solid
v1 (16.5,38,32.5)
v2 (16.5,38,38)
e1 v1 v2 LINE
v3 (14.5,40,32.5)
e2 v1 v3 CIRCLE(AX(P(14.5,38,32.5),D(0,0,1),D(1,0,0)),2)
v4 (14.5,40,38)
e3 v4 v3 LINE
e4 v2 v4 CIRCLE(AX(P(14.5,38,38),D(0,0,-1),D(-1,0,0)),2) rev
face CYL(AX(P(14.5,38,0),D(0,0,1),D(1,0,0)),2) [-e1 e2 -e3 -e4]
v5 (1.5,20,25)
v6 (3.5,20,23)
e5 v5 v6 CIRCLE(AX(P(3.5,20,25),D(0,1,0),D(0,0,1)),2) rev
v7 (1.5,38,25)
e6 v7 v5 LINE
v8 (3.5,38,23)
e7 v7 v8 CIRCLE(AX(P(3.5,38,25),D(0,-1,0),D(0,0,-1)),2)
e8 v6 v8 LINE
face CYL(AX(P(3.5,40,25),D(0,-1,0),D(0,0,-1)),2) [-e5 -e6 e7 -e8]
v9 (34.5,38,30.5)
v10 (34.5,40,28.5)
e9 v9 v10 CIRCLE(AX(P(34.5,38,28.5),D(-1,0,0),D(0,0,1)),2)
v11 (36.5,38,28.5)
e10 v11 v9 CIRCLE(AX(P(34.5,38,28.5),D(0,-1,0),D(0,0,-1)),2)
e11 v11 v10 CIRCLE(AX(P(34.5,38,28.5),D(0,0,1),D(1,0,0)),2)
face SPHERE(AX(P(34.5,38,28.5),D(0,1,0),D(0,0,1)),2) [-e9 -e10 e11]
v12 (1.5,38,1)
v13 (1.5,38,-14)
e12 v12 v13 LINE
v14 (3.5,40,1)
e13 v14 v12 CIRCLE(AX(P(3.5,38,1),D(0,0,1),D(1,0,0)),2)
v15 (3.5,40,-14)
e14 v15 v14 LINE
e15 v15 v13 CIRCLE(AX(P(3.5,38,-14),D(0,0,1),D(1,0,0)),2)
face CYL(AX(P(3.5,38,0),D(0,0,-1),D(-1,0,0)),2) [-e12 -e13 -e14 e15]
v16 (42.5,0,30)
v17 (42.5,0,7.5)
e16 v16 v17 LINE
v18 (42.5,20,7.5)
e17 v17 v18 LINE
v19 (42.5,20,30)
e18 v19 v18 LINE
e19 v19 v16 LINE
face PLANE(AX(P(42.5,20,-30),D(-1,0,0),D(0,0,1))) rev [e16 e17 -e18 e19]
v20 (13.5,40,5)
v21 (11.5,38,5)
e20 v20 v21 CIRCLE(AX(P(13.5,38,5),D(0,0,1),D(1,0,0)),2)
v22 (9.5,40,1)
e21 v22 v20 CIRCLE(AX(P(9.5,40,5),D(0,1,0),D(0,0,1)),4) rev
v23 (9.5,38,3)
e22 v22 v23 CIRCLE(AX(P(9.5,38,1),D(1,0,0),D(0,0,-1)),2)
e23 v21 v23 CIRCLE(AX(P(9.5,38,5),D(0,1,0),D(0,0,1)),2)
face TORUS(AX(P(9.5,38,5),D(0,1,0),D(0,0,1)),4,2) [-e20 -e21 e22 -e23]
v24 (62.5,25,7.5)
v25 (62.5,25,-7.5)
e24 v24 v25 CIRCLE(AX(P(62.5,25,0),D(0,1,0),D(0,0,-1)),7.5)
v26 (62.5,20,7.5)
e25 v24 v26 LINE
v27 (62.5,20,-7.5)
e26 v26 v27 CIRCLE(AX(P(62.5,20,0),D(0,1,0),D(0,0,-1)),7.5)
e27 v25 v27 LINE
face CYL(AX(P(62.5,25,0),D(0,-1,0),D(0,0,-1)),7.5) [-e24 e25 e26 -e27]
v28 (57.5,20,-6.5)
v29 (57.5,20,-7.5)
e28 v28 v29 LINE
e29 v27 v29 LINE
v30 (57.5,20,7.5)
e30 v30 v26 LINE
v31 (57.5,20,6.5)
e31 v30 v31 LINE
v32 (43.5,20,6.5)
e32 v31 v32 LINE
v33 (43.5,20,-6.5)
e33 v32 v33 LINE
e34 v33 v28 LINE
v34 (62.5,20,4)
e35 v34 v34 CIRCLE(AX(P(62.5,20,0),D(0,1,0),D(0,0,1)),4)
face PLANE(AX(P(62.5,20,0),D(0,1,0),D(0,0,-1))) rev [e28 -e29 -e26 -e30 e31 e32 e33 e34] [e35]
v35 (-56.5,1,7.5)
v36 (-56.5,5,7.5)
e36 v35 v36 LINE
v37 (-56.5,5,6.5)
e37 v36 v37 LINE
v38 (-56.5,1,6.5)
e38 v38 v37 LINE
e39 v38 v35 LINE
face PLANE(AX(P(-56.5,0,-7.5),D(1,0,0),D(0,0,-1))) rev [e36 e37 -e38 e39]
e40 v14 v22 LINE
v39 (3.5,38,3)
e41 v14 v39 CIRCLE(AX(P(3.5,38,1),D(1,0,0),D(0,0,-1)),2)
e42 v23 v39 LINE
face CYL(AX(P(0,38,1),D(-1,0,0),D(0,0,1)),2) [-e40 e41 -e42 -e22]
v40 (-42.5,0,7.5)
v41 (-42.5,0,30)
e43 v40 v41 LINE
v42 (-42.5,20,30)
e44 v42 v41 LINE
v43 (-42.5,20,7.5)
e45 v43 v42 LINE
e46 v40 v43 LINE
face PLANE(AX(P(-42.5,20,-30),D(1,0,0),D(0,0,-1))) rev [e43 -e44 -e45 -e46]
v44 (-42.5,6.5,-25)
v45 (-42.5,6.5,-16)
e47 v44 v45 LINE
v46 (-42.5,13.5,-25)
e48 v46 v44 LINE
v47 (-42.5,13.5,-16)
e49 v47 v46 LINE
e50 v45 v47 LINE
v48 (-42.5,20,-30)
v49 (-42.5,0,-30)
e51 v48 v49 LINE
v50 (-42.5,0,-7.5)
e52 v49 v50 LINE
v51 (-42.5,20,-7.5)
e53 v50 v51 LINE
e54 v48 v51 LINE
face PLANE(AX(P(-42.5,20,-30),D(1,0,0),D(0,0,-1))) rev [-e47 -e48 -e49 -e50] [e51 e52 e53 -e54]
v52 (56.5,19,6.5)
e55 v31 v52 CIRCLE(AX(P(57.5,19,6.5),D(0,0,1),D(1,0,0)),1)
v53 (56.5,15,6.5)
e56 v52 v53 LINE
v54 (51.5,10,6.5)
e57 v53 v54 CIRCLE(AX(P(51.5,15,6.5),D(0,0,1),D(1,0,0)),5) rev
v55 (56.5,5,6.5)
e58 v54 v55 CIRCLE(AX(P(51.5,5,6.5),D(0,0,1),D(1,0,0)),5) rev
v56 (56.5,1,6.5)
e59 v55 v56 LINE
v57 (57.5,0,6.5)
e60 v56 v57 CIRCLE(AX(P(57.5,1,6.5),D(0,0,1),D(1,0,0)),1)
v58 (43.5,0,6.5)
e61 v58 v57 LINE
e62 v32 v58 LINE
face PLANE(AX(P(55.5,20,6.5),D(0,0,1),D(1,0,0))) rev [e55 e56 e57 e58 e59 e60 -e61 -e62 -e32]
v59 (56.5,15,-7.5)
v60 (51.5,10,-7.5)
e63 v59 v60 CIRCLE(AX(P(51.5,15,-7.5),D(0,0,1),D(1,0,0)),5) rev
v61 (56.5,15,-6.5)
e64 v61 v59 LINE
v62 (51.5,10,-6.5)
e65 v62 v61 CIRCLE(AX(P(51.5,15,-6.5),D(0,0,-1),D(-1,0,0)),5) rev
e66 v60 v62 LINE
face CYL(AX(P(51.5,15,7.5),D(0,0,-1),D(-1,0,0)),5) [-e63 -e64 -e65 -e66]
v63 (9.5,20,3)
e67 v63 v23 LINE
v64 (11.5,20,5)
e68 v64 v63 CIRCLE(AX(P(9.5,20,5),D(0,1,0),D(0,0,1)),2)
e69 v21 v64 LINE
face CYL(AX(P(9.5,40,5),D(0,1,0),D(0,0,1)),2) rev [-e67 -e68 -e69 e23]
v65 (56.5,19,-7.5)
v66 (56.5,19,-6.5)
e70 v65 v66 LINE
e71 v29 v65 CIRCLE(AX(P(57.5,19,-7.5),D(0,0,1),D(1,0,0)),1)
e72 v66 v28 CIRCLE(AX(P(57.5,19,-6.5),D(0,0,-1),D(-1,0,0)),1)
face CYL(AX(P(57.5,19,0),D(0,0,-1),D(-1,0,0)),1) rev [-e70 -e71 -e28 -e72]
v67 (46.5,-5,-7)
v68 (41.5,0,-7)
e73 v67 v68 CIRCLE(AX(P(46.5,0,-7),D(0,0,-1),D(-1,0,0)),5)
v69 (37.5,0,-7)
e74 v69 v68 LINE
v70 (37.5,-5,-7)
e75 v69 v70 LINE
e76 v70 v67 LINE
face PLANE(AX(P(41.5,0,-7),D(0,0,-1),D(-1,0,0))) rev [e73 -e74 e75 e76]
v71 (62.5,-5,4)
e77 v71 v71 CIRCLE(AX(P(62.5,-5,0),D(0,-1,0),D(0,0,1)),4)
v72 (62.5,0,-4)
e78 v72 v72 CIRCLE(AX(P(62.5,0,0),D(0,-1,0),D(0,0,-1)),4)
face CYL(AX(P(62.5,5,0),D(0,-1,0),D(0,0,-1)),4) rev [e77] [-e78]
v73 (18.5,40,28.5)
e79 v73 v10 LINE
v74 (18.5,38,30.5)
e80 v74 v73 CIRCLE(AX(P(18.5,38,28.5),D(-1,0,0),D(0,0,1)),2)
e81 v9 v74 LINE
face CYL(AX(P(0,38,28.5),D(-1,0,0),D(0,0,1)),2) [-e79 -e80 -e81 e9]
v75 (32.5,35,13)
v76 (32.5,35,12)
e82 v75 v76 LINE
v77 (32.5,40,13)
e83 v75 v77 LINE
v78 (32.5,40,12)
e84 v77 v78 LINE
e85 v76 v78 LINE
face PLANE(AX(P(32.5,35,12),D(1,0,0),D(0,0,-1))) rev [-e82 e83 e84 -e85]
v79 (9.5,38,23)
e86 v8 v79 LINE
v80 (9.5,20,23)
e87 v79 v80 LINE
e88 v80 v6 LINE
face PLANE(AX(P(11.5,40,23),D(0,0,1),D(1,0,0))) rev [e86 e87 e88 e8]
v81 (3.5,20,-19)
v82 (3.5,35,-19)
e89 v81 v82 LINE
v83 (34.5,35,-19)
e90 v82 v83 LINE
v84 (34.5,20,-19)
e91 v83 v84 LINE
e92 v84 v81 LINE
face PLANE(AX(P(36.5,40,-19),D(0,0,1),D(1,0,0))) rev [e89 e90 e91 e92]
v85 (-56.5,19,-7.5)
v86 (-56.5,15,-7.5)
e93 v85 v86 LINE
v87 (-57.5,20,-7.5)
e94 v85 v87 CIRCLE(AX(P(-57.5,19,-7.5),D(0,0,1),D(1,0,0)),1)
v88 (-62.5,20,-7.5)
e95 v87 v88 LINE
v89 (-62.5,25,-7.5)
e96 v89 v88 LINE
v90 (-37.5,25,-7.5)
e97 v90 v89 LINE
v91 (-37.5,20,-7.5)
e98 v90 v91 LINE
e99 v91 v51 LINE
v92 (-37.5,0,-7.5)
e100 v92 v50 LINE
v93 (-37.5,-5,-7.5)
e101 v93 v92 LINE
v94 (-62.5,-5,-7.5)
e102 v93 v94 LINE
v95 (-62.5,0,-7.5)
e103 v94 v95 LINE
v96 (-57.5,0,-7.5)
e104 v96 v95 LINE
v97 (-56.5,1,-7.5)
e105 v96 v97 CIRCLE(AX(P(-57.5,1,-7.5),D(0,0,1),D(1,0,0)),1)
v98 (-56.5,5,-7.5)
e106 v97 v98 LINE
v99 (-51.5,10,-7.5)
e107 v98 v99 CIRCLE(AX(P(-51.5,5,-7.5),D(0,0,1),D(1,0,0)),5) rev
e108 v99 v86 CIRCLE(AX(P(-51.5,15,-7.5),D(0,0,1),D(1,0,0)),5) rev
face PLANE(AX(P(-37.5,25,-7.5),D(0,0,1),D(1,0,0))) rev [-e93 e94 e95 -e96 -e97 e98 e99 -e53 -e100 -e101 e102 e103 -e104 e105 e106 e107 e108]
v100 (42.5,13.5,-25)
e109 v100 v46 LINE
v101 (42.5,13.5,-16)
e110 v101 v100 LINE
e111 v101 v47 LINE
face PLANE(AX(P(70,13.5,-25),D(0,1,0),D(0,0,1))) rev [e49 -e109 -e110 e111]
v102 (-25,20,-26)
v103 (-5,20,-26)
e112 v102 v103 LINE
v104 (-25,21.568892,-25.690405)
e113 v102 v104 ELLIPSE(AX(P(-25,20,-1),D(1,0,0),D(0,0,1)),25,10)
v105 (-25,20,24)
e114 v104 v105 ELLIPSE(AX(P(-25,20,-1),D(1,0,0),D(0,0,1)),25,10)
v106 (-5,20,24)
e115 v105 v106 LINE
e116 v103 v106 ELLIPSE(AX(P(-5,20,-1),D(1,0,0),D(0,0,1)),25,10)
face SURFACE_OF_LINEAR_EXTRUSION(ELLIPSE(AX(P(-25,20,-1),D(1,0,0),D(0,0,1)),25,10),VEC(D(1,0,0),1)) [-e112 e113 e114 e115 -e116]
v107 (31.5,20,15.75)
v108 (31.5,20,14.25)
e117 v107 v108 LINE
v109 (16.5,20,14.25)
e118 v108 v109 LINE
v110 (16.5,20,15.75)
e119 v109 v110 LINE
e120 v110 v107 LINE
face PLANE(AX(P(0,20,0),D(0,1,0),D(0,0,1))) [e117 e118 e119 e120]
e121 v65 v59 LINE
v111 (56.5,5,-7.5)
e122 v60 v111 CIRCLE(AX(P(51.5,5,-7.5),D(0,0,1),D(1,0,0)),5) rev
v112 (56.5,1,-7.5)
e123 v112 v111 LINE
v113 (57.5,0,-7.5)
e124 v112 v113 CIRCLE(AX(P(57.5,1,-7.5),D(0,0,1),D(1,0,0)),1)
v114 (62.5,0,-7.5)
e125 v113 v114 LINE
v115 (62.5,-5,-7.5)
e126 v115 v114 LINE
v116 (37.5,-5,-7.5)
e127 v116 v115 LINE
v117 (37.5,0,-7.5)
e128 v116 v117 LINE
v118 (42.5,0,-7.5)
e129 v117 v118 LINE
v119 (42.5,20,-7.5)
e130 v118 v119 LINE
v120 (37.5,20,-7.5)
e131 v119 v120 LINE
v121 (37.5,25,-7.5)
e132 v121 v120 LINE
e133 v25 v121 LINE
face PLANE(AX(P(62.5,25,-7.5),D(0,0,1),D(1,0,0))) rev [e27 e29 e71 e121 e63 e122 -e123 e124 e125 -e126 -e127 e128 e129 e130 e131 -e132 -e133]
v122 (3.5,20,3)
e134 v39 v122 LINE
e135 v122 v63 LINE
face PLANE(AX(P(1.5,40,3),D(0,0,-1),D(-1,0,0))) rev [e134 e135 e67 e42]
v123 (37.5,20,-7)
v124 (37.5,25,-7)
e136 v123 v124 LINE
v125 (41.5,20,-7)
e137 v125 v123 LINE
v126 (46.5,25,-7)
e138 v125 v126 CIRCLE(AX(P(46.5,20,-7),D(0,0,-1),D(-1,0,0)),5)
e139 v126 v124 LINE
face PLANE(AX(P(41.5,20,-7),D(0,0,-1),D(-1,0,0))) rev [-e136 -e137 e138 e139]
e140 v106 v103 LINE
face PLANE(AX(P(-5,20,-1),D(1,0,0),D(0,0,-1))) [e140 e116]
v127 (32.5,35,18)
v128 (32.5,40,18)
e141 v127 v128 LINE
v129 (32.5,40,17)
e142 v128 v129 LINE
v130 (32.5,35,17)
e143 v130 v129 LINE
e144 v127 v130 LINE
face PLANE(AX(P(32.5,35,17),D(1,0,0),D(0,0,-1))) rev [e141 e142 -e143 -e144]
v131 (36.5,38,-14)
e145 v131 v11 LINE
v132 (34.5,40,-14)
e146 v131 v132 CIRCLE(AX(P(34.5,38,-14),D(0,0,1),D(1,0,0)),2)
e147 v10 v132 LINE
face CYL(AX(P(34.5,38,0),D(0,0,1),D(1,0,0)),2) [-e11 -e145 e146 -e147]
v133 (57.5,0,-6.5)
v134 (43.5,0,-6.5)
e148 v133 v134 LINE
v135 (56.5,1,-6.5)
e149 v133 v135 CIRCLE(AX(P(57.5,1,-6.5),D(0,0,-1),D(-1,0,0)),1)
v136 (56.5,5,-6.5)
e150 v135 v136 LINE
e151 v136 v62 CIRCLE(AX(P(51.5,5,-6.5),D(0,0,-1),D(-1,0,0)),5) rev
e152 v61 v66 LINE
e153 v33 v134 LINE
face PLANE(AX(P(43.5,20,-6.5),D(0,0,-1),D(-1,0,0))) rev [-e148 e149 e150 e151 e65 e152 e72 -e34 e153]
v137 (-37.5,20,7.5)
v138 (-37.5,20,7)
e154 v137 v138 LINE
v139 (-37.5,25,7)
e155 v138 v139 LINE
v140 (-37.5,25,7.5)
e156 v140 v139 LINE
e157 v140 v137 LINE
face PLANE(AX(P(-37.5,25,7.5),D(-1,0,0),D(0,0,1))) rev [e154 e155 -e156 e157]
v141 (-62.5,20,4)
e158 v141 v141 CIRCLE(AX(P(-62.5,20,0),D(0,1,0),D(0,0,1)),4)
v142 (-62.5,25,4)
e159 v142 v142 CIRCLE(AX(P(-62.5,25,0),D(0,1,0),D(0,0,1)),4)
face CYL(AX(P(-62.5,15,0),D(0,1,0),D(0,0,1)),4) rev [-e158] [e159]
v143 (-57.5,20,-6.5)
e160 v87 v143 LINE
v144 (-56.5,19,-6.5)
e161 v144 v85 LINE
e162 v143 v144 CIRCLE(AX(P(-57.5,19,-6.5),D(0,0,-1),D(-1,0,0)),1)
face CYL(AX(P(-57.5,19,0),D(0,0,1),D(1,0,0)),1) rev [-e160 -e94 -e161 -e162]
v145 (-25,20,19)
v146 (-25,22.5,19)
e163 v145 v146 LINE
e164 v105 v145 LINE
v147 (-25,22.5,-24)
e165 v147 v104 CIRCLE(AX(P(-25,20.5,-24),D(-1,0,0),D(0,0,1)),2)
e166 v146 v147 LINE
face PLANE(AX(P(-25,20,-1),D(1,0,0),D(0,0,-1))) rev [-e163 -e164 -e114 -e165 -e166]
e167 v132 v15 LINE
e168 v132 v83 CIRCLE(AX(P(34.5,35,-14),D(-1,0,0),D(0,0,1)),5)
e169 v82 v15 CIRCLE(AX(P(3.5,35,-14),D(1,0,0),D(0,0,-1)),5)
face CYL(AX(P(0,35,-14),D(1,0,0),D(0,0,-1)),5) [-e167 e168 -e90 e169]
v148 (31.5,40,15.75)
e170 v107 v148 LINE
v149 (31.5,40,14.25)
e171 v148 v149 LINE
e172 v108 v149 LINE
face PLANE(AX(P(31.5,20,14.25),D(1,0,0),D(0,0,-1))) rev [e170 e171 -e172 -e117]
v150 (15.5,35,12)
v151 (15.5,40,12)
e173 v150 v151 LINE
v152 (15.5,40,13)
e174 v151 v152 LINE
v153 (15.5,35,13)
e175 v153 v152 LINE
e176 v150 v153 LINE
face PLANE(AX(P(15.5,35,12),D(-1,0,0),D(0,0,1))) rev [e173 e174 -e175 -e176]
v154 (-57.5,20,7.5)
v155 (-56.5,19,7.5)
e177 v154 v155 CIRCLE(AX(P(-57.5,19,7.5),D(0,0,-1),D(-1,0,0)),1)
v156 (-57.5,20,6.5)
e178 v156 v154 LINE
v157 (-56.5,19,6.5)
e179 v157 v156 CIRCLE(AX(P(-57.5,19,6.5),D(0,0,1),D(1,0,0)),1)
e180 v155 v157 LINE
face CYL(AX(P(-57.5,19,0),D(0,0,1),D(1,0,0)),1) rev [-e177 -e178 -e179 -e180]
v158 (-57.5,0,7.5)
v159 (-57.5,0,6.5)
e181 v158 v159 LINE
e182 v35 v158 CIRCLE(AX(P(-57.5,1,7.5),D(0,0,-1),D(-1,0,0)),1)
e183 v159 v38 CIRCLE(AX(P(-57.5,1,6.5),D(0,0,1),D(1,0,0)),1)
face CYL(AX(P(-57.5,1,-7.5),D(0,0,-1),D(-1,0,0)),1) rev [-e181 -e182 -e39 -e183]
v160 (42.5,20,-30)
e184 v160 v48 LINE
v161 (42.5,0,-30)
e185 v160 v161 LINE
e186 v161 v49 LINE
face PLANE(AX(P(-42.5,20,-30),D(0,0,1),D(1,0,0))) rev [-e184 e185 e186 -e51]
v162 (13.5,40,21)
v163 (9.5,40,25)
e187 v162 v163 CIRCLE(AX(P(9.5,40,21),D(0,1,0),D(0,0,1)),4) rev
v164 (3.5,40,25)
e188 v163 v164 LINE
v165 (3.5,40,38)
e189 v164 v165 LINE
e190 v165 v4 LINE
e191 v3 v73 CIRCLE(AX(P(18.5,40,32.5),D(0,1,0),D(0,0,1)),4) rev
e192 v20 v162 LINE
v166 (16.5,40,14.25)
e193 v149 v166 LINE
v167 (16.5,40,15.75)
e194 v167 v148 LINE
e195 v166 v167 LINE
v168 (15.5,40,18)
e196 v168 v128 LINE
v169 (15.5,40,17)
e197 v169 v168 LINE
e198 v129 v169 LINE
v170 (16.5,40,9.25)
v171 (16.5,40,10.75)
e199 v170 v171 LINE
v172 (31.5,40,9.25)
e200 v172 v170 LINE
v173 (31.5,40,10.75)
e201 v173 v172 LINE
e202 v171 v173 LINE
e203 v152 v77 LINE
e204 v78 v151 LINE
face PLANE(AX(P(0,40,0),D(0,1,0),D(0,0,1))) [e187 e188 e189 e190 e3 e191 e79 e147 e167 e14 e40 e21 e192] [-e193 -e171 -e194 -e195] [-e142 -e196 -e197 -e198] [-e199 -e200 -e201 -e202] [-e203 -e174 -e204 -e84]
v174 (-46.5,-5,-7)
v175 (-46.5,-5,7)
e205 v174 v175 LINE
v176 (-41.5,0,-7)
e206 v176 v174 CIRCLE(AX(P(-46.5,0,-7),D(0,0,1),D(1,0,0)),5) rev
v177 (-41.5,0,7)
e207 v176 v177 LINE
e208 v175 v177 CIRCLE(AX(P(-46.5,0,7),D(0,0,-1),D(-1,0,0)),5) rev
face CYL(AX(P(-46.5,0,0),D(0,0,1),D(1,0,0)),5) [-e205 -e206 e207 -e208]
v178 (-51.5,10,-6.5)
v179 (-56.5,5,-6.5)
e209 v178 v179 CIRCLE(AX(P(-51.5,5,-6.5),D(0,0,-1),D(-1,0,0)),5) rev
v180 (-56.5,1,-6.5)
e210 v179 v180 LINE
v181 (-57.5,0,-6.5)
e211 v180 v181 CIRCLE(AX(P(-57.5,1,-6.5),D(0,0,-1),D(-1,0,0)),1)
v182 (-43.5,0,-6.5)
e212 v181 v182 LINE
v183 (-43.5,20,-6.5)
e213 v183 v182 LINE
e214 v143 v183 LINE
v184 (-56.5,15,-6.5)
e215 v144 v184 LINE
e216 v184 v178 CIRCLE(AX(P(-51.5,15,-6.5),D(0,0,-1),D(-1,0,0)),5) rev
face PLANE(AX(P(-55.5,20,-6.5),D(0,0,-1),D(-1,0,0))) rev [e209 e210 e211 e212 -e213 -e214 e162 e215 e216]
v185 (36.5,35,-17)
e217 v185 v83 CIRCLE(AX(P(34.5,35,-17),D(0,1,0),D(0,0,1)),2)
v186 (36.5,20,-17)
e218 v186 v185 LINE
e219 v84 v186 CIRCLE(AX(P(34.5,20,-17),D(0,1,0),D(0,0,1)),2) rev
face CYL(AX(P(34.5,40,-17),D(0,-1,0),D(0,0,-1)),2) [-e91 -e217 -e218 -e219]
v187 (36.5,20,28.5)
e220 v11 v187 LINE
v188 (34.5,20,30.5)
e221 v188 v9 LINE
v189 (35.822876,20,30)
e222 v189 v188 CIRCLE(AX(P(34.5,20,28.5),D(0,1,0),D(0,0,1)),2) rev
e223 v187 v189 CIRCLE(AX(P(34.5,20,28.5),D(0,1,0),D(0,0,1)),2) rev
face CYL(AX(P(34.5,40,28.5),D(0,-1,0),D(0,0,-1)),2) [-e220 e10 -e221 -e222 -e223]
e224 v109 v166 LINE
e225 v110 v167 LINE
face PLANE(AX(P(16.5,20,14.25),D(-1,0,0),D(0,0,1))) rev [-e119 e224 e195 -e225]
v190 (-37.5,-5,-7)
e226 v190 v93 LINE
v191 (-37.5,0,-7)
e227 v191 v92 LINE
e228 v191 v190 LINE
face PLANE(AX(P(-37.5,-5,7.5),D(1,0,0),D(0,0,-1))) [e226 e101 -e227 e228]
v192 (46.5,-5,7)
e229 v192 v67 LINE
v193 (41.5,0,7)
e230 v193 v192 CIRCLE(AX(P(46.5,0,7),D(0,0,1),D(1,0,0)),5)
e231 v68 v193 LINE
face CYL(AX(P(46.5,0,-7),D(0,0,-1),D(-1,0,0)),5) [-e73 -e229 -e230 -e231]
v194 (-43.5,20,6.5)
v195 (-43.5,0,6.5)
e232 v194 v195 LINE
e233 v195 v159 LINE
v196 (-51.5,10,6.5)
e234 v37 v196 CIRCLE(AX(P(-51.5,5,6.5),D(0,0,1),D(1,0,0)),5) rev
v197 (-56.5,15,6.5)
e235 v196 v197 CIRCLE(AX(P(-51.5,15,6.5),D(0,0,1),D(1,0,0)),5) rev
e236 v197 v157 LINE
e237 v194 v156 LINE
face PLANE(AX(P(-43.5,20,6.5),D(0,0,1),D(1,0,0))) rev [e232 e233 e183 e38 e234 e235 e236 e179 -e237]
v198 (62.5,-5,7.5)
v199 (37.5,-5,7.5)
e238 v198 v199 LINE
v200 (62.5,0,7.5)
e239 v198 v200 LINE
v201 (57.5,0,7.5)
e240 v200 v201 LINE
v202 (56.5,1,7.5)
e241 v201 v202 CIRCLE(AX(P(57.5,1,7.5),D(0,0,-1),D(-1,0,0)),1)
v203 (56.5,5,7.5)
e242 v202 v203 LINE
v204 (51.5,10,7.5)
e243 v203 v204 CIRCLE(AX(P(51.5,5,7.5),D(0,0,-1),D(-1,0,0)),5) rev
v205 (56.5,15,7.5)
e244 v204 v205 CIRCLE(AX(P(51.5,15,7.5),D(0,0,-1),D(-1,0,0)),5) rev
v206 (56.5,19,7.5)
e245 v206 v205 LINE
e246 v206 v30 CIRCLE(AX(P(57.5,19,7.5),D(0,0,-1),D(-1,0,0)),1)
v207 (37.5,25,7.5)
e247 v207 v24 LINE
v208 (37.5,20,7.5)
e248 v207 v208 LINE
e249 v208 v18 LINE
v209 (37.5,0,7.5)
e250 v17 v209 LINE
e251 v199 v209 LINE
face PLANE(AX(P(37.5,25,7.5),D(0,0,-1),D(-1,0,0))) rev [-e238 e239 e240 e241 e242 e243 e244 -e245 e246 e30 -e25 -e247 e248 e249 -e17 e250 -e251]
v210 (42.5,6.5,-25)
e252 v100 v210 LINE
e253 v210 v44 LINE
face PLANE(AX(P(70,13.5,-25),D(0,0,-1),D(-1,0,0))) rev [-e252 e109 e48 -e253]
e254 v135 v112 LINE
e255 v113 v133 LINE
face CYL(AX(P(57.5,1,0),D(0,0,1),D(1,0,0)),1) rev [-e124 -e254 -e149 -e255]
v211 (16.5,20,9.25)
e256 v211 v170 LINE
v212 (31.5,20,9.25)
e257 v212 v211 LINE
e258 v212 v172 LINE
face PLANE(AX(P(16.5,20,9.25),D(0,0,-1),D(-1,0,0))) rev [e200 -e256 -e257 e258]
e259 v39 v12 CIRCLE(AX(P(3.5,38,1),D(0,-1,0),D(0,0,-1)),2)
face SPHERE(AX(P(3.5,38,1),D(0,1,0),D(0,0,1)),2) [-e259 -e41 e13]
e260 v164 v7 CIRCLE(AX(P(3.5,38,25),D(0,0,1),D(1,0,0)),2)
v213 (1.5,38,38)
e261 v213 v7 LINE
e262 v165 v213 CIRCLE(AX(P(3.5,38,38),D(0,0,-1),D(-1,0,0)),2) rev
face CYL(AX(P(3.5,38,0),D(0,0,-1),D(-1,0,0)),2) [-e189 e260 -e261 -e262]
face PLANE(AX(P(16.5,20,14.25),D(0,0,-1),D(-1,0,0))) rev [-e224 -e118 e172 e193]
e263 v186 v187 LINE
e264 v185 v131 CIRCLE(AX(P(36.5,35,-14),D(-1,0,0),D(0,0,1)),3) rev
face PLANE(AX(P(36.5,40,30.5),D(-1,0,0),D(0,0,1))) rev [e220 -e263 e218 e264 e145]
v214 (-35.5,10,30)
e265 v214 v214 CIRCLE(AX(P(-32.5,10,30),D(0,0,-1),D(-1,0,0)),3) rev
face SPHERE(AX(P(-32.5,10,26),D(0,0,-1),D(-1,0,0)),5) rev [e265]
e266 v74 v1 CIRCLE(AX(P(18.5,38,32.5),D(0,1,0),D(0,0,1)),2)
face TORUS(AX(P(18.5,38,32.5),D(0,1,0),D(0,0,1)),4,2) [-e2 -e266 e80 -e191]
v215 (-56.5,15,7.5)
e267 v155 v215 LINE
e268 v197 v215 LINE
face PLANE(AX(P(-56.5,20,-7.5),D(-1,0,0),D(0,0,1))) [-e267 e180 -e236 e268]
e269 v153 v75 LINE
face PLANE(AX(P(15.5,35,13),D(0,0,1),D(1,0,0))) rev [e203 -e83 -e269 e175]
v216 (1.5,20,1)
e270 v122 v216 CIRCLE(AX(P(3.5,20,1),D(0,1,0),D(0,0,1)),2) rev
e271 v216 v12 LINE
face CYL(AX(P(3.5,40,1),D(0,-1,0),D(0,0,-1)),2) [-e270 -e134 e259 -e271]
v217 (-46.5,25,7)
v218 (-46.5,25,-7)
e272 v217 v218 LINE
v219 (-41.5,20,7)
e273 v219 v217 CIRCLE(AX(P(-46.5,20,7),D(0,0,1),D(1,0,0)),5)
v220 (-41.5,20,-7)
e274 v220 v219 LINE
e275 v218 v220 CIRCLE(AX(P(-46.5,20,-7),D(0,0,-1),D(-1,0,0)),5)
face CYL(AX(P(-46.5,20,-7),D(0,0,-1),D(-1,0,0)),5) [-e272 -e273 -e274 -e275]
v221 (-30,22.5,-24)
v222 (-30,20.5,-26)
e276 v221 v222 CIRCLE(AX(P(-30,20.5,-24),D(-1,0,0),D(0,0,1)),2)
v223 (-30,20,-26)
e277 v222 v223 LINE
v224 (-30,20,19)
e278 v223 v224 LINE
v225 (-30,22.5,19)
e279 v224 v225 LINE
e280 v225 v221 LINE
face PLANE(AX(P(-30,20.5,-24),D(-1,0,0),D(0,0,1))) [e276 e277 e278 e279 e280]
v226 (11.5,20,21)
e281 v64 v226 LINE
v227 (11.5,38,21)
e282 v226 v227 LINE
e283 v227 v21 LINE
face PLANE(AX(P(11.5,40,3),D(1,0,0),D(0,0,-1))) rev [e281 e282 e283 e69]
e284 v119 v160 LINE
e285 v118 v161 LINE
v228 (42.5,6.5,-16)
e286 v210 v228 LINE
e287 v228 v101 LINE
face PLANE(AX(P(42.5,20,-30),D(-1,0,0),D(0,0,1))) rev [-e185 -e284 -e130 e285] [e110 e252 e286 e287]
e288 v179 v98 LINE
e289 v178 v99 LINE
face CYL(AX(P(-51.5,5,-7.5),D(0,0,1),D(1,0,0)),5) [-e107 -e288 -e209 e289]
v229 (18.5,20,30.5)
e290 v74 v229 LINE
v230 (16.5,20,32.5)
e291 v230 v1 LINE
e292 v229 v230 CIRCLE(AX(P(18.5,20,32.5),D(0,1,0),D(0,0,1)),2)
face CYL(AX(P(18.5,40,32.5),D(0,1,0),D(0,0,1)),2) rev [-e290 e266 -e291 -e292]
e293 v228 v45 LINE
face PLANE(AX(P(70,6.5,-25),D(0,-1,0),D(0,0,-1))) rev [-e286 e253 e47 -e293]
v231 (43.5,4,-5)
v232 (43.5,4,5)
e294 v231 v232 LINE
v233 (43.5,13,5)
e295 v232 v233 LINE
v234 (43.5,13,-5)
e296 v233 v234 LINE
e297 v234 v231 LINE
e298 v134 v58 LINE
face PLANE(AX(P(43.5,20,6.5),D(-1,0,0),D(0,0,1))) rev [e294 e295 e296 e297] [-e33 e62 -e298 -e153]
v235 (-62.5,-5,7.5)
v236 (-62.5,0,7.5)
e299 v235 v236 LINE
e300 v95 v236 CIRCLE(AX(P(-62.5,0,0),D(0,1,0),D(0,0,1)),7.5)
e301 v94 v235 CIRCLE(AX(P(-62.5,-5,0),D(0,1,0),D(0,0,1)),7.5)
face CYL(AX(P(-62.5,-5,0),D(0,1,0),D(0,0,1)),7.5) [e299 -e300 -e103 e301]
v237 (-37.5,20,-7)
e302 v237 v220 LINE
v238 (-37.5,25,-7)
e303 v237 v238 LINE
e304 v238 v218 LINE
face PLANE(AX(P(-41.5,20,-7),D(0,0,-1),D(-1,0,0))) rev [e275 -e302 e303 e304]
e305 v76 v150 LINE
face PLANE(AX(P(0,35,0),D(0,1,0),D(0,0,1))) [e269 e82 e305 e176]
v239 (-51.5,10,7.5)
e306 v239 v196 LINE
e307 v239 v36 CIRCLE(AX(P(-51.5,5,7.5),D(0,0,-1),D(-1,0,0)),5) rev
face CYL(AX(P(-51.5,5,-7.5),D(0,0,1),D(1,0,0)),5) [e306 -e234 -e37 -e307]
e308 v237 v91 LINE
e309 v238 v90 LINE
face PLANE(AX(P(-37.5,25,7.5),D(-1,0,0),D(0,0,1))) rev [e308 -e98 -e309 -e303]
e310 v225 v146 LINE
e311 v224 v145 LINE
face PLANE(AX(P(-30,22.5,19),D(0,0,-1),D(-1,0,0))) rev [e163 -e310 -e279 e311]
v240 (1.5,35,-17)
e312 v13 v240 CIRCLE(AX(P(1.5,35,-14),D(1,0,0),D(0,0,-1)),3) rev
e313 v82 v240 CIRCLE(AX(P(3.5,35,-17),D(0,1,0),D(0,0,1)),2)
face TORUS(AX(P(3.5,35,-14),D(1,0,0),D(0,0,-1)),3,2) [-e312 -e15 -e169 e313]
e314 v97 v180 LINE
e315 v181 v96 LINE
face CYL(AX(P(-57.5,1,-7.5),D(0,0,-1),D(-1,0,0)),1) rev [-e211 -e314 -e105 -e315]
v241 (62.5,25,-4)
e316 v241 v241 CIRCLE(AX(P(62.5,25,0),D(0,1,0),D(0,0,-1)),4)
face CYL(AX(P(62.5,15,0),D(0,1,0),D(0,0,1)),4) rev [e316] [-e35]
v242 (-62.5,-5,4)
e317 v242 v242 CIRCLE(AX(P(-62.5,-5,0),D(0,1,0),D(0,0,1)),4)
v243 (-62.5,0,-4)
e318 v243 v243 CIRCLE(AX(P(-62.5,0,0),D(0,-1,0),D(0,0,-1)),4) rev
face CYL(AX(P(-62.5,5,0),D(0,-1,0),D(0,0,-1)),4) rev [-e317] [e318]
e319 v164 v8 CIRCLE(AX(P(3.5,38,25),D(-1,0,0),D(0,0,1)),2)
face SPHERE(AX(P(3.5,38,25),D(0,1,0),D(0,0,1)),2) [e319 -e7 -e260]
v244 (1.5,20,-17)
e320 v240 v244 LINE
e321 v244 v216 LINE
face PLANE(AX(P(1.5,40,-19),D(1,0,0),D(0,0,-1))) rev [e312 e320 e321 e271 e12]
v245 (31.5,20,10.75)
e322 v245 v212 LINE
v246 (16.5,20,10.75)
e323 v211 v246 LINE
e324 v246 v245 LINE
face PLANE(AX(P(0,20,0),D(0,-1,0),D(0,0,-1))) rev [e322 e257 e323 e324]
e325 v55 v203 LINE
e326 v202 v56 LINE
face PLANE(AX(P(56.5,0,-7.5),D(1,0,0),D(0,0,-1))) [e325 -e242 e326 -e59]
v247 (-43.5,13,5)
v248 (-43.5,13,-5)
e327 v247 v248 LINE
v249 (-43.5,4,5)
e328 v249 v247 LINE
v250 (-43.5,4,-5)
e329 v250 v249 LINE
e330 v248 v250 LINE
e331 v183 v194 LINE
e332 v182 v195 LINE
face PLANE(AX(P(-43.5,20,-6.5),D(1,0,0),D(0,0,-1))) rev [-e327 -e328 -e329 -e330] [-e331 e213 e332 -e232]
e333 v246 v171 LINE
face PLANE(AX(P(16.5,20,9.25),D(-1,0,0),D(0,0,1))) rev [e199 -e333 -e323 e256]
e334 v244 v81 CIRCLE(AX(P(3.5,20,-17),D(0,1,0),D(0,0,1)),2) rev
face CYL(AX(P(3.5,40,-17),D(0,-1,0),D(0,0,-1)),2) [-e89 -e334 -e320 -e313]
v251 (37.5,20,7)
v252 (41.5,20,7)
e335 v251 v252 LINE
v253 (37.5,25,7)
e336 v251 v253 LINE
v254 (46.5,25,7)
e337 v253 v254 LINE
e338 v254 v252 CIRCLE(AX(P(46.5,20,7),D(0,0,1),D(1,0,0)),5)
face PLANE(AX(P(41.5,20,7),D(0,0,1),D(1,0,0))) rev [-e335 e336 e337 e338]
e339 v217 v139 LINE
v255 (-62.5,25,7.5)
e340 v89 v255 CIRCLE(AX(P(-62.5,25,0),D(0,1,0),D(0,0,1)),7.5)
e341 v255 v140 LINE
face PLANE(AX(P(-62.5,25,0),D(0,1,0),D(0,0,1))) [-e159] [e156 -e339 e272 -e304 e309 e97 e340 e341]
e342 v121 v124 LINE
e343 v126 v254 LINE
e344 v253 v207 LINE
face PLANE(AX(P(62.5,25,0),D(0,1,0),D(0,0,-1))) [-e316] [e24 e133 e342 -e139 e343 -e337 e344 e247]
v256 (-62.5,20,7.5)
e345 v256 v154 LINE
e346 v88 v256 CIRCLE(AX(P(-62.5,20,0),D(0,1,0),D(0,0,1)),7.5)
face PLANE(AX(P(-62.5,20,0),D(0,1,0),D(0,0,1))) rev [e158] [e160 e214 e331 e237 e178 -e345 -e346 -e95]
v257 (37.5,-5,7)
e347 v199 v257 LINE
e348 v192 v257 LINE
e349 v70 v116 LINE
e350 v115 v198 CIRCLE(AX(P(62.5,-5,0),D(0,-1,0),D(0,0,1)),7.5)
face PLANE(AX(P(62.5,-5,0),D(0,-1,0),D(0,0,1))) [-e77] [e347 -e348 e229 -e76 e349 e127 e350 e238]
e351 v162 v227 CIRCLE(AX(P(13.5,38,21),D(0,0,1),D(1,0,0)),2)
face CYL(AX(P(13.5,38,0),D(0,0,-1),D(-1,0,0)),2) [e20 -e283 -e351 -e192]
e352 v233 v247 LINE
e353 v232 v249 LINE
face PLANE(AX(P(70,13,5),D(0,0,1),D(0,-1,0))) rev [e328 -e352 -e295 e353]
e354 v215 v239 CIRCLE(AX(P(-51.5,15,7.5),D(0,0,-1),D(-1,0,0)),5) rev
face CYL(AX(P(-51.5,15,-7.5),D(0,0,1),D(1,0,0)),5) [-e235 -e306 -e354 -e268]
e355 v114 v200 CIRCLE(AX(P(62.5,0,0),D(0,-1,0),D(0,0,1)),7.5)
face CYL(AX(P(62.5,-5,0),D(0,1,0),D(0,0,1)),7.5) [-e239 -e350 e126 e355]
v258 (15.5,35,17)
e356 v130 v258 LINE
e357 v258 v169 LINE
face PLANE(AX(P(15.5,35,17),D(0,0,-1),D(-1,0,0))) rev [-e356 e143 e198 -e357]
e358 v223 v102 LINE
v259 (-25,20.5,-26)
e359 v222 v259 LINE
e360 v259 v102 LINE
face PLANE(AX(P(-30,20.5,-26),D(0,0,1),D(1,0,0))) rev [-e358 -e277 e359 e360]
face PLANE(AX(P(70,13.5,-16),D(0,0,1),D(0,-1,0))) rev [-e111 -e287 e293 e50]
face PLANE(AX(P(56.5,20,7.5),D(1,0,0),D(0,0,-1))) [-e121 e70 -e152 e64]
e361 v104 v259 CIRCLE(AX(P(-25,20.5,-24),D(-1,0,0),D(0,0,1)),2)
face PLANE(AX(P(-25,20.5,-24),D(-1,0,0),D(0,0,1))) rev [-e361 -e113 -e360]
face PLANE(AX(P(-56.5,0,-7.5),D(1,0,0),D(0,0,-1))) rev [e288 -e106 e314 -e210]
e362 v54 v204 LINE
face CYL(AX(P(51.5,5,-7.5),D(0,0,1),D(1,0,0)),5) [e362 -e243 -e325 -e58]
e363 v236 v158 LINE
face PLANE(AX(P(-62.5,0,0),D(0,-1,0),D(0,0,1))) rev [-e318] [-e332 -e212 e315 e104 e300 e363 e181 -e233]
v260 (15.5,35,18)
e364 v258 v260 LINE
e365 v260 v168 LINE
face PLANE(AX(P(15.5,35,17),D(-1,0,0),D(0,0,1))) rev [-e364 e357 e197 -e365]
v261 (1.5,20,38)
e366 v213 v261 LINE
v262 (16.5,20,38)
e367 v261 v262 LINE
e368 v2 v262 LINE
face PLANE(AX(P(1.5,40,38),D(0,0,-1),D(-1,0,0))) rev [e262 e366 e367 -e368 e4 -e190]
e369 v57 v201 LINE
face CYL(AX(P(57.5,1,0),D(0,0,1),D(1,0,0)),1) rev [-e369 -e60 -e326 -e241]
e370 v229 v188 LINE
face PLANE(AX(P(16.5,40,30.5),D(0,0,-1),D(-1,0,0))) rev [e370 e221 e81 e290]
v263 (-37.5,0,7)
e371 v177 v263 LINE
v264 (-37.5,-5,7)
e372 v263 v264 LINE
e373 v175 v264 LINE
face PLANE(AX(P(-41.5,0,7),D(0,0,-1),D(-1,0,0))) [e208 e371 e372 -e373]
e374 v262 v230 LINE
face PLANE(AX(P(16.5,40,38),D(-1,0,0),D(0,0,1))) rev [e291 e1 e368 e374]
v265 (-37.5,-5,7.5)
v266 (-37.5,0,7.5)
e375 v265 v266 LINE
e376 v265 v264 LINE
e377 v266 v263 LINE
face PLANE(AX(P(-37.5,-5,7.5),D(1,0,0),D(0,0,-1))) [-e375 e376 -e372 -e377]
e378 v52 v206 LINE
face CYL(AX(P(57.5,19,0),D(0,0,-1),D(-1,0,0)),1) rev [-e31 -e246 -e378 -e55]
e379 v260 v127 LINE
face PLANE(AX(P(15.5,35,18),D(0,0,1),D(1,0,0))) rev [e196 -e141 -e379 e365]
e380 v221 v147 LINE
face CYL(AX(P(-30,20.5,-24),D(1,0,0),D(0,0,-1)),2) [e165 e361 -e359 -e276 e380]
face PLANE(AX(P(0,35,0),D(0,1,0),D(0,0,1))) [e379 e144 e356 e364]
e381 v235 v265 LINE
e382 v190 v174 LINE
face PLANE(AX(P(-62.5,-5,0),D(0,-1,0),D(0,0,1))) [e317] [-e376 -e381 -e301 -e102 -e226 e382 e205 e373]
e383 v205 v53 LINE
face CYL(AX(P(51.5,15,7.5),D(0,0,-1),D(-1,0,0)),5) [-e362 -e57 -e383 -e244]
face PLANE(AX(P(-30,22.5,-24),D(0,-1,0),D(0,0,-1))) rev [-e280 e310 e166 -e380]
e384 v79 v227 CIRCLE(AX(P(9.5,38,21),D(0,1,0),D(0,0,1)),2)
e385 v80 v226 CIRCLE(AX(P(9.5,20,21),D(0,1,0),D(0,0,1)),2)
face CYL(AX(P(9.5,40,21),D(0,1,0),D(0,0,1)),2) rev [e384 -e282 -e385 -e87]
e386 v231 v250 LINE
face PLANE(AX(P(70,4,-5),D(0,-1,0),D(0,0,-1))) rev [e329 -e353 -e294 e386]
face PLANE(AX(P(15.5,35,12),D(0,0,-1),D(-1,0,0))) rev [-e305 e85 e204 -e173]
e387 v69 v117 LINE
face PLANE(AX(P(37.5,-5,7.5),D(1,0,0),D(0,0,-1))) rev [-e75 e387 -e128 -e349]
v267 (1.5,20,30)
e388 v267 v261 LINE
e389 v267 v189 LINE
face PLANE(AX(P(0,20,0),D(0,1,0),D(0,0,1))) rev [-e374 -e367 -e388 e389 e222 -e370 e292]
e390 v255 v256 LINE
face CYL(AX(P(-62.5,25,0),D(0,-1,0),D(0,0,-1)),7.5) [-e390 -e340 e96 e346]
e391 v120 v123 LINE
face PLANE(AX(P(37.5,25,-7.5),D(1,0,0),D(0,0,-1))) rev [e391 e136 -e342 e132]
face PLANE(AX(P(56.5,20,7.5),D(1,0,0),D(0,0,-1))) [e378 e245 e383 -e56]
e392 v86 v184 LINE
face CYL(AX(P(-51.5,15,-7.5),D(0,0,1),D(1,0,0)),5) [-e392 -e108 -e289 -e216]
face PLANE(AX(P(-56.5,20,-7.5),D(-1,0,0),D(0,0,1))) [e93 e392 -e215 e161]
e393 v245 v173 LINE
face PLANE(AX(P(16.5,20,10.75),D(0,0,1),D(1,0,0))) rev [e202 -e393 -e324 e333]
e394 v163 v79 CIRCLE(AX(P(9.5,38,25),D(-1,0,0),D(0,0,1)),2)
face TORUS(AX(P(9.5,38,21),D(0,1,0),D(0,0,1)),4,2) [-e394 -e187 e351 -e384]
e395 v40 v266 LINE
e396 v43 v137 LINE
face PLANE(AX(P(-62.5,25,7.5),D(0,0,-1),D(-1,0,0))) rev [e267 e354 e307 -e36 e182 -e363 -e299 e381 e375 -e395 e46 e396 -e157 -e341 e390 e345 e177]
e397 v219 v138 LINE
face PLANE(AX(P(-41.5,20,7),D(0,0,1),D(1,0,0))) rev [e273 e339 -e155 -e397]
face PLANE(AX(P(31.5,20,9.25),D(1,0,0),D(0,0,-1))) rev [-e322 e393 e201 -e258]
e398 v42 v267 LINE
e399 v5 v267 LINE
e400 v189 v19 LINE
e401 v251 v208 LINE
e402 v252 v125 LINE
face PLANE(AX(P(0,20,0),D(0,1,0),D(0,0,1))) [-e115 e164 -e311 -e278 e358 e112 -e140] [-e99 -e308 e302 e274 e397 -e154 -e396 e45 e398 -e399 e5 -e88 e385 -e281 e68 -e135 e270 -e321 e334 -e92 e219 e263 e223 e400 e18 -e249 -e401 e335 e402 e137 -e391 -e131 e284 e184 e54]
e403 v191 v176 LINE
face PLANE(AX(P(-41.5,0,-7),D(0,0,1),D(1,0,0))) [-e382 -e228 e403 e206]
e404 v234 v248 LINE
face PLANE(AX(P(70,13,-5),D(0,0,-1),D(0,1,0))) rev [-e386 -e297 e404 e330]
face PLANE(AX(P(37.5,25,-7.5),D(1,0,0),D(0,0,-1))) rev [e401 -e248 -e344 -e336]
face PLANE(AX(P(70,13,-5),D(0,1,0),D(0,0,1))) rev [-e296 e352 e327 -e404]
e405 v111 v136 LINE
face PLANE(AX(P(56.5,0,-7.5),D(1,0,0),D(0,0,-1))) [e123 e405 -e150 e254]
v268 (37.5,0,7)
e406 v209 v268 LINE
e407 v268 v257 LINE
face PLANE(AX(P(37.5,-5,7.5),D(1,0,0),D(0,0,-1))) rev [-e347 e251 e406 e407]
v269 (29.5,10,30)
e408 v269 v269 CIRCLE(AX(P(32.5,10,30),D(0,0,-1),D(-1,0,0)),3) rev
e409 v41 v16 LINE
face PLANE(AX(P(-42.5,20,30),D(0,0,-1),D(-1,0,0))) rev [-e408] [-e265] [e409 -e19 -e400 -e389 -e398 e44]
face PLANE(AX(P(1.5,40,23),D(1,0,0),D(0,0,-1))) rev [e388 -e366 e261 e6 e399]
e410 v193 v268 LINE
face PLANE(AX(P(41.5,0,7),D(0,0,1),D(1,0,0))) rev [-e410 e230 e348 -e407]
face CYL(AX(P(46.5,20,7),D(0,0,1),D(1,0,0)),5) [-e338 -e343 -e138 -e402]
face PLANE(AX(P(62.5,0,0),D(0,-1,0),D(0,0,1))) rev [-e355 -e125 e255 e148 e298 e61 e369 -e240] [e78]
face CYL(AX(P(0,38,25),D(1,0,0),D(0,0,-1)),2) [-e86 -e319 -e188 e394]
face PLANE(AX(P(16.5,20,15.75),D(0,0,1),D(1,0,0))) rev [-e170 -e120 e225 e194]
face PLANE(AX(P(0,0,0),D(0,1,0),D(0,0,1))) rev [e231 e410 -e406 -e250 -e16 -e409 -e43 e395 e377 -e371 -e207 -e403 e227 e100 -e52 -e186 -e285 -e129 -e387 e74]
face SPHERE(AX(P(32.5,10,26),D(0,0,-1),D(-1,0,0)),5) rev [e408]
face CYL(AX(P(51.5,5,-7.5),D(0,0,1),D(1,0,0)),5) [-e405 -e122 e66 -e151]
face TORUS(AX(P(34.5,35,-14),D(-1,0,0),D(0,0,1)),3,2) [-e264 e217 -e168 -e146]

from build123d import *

# Parameters (mm, degrees)
SKETCH1_W                = 85
SKETCH1_H                = 60
BOSS_EXTRUDE1_DEPTH      = 20
BOSS_EXTRUDE4_DEPTH      = 5
SKETCH4_W                = 4
SKETCH4_H                = 14
CUT_EXTRUDE2_DEPTH       = 5
FILLET1_R                = 5
SKETCH5_W                = 14
SKETCH5_H                = 10
BOSS_EXTRUDE6_DEPTH      = 7.5
SKETCH7_W                = 12
SKETCH7_H                = 13
CUT_EXTRUDE5_DEPTH       = 10
SKETCH8_W                = 13
SKETCH8_H                = 10
CUT_EXTRUDE6_DEPTH       = 10
FILLET4_R                = 5
FILLET5_R                = 1
SKETCH9_R                = 4
CUT_EXTRUDE7_DEPTH       = 10
BOSS_EXTRUDE7_DEPTH      = 20
FILLET6_R                = 5
FILLET7_START            = 20
FILLET7_DEPTH            = 21
FILLET7_2_DEPTH          = 20
FILLET8_R                = 2
CIRPATTERN1_COUNT        = 2
FILLET1_OF_CIRPATTERN1_R = 5
FILLET4_OF_CIRPATTERN1_R = 5
FILLET5_OF_CIRPATTERN1_R = 1
CIRPATTERN5_START        = -7.5
CIRPATTERN5_DEPTH        = 1
CIRPATTERN5_START_2      = 6.5
CIRPATTERN5_2_DEPTH      = 1
CIRPATTERN5_START_3      = -5
CIRPATTERN5_3_OUTLINE_R  = 4
CIRPATTERN5_3_DEPTH      = 5
CIRPATTERN5_4_OUTLINE_W  = 1
CIRPATTERN5_4_OUTLINE_H  = 15
CIRPATTERN5_4_DEPTH      = 10
CIRPATTERN5_START_4      = -7
CIRPATTERN5_5_DEPTH      = 14
CIRPATTERN5_6_DEPTH      = 14
MIRROR1_START            = -7.5
MIRROR1_DEPTH            = 1
MIRROR1_START_2          = 6.5
MIRROR1_2_DEPTH          = 1
MIRROR1_START_3          = -5
MIRROR1_3_OUTLINE_R      = 4
MIRROR1_3_DEPTH          = 5
MIRROR1_4_OUTLINE_W      = 1
MIRROR1_4_OUTLINE_H      = 15
MIRROR1_4_DEPTH          = 10
MIRROR1_START_4          = -7
MIRROR1_5_DEPTH          = 14
MIRROR1_6_DEPTH          = 14
SKETCH16_W               = 17
SKETCH16_H               = 1
CUT_EXTRUDE9_DEPTH       = 5
BOSS_EXTRUDE8_DEPTH      = 20
BOSS_EXTRUDE9_DEPTH      = 5
SKETCH25_W               = 9
SKETCH25_H               = 7
CUT_EXTRUDE10_DEPTH      = 126.300638466
SKETCH11_W               = 15
SKETCH11_H               = 1.5
CUT_EXTRUDE8_DEPTH       = 20
SKETCH26_W               = 10
SKETCH26_H               = 9
CUT_EXTRUDE11_DEPTH      = 127.199247224


with BuildPart() as part:
    # Sketch1 → Boss-Extrude1 (new body)
    with BuildSketch(Plane(origin=(0, 0, 0), x_dir=(1, 0, 0), z_dir=(0, 1, 0))):
        Rectangle(SKETCH1_W, SKETCH1_H)
    extrude(amount=BOSS_EXTRUDE1_DEPTH)

    # Sketch2 → Boss-Extrude4 (add)
    with BuildSketch(Plane(origin=(0, 20, 0), x_dir=(1, 0, 0), z_dir=(0, 1, 0))):
        with BuildLine():
            Line((-37.5, 7.5), (-62.5, 7.5))
            ThreePointArc((-62.5, 7.5), (-70, 0), (-62.5, -7.5))
            Line((-62.5, -7.5), (-37.5, -7.5))
            Line((-37.5, -7.5), (-37.5, 7.5))
        make_face()
    boss_extrude4 = extrude(amount=BOSS_EXTRUDE4_DEPTH)

    # Sketch4 → Cut-Extrude2 (cut)
    with BuildSketch(Plane(origin=(0, 25, 0), x_dir=(1, 0, 0), z_dir=(0, 1, 0))):
        with Locations((-39.5, 0)):
            Rectangle(SKETCH4_W, SKETCH4_H)
    cut_extrude2 = extrude(amount=-CUT_EXTRUDE2_DEPTH, mode=Mode.SUBTRACT)

    # Fillet1
    fillet1_edges = [part.edges().sort_by_distance(p)[0] for p in [
        (-41.5, 25, 0),
    ]]
    fillet(fillet1_edges, radius=FILLET1_R - 0.0001)  # a hair under: the kernel refuses the full size

    # Sketch5 → Boss-Extrude6 (add, symmetric)
    with BuildSketch(Plane.XY):
        with Locations((-49.5, 15)):
            Rectangle(SKETCH5_W, SKETCH5_H)
    boss_extrude6 = extrude(amount=BOSS_EXTRUDE6_DEPTH, both=True)

    # Sketch7 → Cut-Extrude5 (cut)
    with BuildSketch(Plane.XZ.offset(-10)):
        with Locations((-49.5, 0)):
            Rectangle(SKETCH7_W, SKETCH7_H)
    cut_extrude5 = extrude(amount=-CUT_EXTRUDE5_DEPTH, mode=Mode.SUBTRACT)

    # Sketch8 → Cut-Extrude6 (cut)
    with BuildSketch(Plane(origin=(-55.5, 0, 0), x_dir=(0, 0, -1), z_dir=(1, 0, 0))):
        with Locations((0, 15)):
            Rectangle(SKETCH8_W, SKETCH8_H)
    cut_extrude6 = extrude(amount=-CUT_EXTRUDE6_DEPTH, mode=Mode.SUBTRACT)

    # Fillet4
    fillet4_edges = [part.edges().sort_by_distance(p)[0] for p in [
        (-56.5, 10, -7),
        (-56.5, 10, 7),
    ]]
    fillet(fillet4_edges, radius=FILLET4_R)

    # Fillet5
    fillet5_edges = [part.edges().sort_by_distance(p)[0] for p in [
        (-56.5, 20, -7),
        (-56.5, 20, 7),
    ]]
    fillet(fillet5_edges, radius=FILLET5_R)

    # Sketch9 → Cut-Extrude7 (cut)
    with BuildSketch(Plane(origin=(0, 25, 0), x_dir=(1, 0, 0), z_dir=(0, 1, 0))):
        with Locations(Location((-62.5, 0, 0), (0, 0, 270))):
            Circle(SKETCH9_R)
    cut_extrude7 = extrude(amount=-CUT_EXTRUDE7_DEPTH, mode=Mode.SUBTRACT)

    # Sketch10 → Boss-Extrude7 (add)
    with BuildSketch(Plane(origin=(0, 20, 0), x_dir=(1, 0, 0), z_dir=(0, 1, 0))):
        Polygon((1.5, -3), (11.5, -3), (11.5, -23), (1.5, -23), (1.5, -38), (16.5, -38), (16.5, -30.5), (36.5, -30.5), (36.5, 0.746164075), (36.5, 19), (1.5, 19), align=None)
    extrude(amount=BOSS_EXTRUDE7_DEPTH)

    # Fillet6
    fillet6_edges = [part.edges().sort_by_distance(p)[0] for p in [
        (19, 40, -19),
    ]]
    fillet(fillet6_edges, radius=FILLET6_R)

    # Fillet7: read off the stored shape, not the designer's step
    # Fillet7 outline → Fillet7 (cut)
    with BuildSketch(Plane(origin=(0, 0, 0), x_dir=(1, 0, 0), z_dir=(0, 1, 0)).offset(FILLET7_START)):
        with BuildLine():
            Line((36.5, -30.5), (36.5, -28.5))
            ThreePointArc((36.5, -28.5), (35.914213562, -29.914213562), (34.5, -30.5))
            Line((34.5, -30.5), (36.5, -30.5))
        make_face()
        with BuildLine():
            Line((1.5, -23), (1.5, -25))
            ThreePointArc((1.5, -25), (2.085786438, -23.585786438), (3.5, -23))
            Line((3.5, -23), (1.5, -23))
        make_face()
        with BuildLine():
            Line((1.5, -3), (3.5, -3))
            ThreePointArc((3.5, -3), (2.085786438, -2.414213562), (1.5, -1))
            Line((1.5, -1), (1.5, -3))
        make_face()
    extrude(amount=FILLET7_DEPTH, mode=Mode.SUBTRACT)

    # Fillet7 2 outline → Fillet7 2 (add)
    with BuildSketch(Plane(origin=(0, 0, 0), x_dir=(1, 0, 0), z_dir=(0, 1, 0)).offset(FILLET7_START)):
        with BuildLine():
            ThreePointArc((16.5, -32.5), (17.085786438, -31.085786438), (18.5, -30.5))
            Line((18.5, -30.5), (16.5, -30.5))
            Line((16.5, -30.5), (16.5, -32.5))
        make_face()
        with BuildLine():
            ThreePointArc((9.5, -3), (10.914213562, -3.585786438), (11.5, -5))
            Line((11.5, -5), (11.5, -3))
            Line((11.5, -3), (9.5, -3))
        make_face()
        with BuildLine():
            ThreePointArc((11.5, -21), (10.914213562, -22.414213562), (9.5, -23))
            Line((9.5, -23), (11.5, -23))
            Line((11.5, -23), (11.5, -21))
        make_face()
    extrude(amount=FILLET7_2_DEPTH)

    # Fillet8
    fillet8_edges = [part.edges().sort_by_distance(p)[0] for p in [
        (16.5, 40, 35.25),
        (1.5, 40, -6.5),
        (1.5, 27.5, -19),
        (1.5, 38.535533906, -17.535533906),
        (36.5, 27.5, -19),
        (36.5, 38.535533906, -17.535533906),
        (36.5, 40, 7.25),
        (26.5, 40, 30.5),
        (6.5, 40, 3),
        (11.5, 40, 13),
        (6.5, 40, 23),
        (1.5, 40, 31.5),
        (2.085786438, 40, 2.414213562),
        (2.085786438, 40, 23.585786438),
        (35.914213562, 40, 29.914213562),
        (17.085786438, 40, 31.085786438),
        (10.914213562, 40, 22.414213562),
        (10.914213562, 40, 3.585786438),
    ]]
    fillet(fillet8_edges, radius=FILLET8_R)

    # CirPattern1: Boss-Extrude4, Cut-Extrude2, Boss-Extrude6, Cut-Extrude5, Cut-Extrude6, Cut-Extrude7 ×2 about axis
    cirpattern1_axis = Axis((0, 0, 0), (0, 1, 0))
    add([boss_extrude4.rotate(cirpattern1_axis, i * 360 / CIRPATTERN1_COUNT) for i in range(1, CIRPATTERN1_COUNT)])
    add([cut_extrude2.rotate(cirpattern1_axis, i * 360 / CIRPATTERN1_COUNT) for i in range(1, CIRPATTERN1_COUNT)], mode=Mode.SUBTRACT)
    add([boss_extrude6.rotate(cirpattern1_axis, i * 360 / CIRPATTERN1_COUNT) for i in range(1, CIRPATTERN1_COUNT)])
    add([cut_extrude5.rotate(cirpattern1_axis, i * 360 / CIRPATTERN1_COUNT) for i in range(1, CIRPATTERN1_COUNT)], mode=Mode.SUBTRACT)
    add([cut_extrude6.rotate(cirpattern1_axis, i * 360 / CIRPATTERN1_COUNT) for i in range(1, CIRPATTERN1_COUNT)], mode=Mode.SUBTRACT)
    add([cut_extrude7.rotate(cirpattern1_axis, i * 360 / CIRPATTERN1_COUNT) for i in range(1, CIRPATTERN1_COUNT)], mode=Mode.SUBTRACT)

    # Fillet1 of CirPattern1
    fillet1_of_cirpattern1_edges = [part.edges().sort_by_distance(p)[0] for p in [
        (41.5, 25, 0),
    ]]
    fillet(fillet1_of_cirpattern1_edges, radius=FILLET1_OF_CIRPATTERN1_R - 0.0001)  # a hair under: the kernel refuses the full size

    # Fillet4 of CirPattern1
    fillet4_of_cirpattern1_edges = [part.edges().sort_by_distance(p)[0] for p in [
        (56.5, 10, 7),
        (56.5, 10, -7),
    ]]
    fillet(fillet4_of_cirpattern1_edges, radius=FILLET4_OF_CIRPATTERN1_R)

    # Fillet5 of CirPattern1
    fillet5_of_cirpattern1_edges = [part.edges().sort_by_distance(p)[0] for p in [
        (56.5, 20, 7),
        (56.5, 20, -7),
    ]]
    fillet(fillet5_of_cirpattern1_edges, radius=FILLET5_OF_CIRPATTERN1_R)

    # CirPattern5: read off the stored shape, not the designer's step
    # CirPattern5 outline → CirPattern5 (add)
    with BuildSketch(Plane.XY.offset(CIRPATTERN5_START)):
        with BuildLine():
            ThreePointArc((57.5, 0), (56.792893219, 0.292893219), (56.5, 1))
            Line((56.5, 1), (56.5, 5))
            ThreePointArc((56.5, 5), (55.035533906, 8.535533906), (51.5, 10))
            Line((51.5, 10), (43.5, 10))
            Line((43.5, 10), (43.5, 0))
            Line((43.5, 0), (57.5, 0))
        make_face()
    extrude(amount=CIRPATTERN5_DEPTH)

    # CirPattern5 2 outline → CirPattern5 2 (add)
    with BuildSketch(Plane.XY.offset(CIRPATTERN5_START_2)):
        with BuildLine():
            ThreePointArc((57.5, 0), (56.792893219, 0.292893219), (56.5, 1))
            Line((56.5, 1), (56.5, 5))
            ThreePointArc((56.5, 5), (55.035533906, 8.535533906), (51.5, 10))
            Line((51.5, 10), (43.5, 10))
            Line((43.5, 10), (43.5, 0))
            Line((43.5, 0), (57.5, 0))
        make_face()
    extrude(amount=CIRPATTERN5_2_DEPTH)

    # CirPattern5 3 outline → CirPattern5 3 (add)
    with BuildSketch(Plane(origin=(0, 0, 0), x_dir=(1, 0, 0), z_dir=(0, 1, 0)).offset(CIRPATTERN5_START_3)):
        with BuildLine():
            Line((37.5, 7.5), (37.5, 7))
            Line((37.5, 7), (42.5, 7))
            Line((42.5, 7), (42.5, -7))
            Line((42.5, -7), (37.5, -7))
            Line((37.5, -7), (37.5, -7.5))
            Line((37.5, -7.5), (62.5, -7.5))
            ThreePointArc((62.5, -7.5), (70, 0), (62.5, 7.5))
            Line((62.5, 7.5), (37.5, 7.5))
        make_face()
        with Locations((62.5, 0)):
            Circle(CIRPATTERN5_3_OUTLINE_R, mode=Mode.SUBTRACT)
    extrude(amount=CIRPATTERN5_3_DEPTH)

    # CirPattern5 4 outline → CirPattern5 4 (add)
    with BuildSketch(Plane(origin=(0, 0, 0), x_dir=(1, 0, 0), z_dir=(0, 1, 0))):
        with Locations((43, 0)):
            Rectangle(CIRPATTERN5_4_OUTLINE_W, CIRPATTERN5_4_OUTLINE_H)
    extrude(amount=CIRPATTERN5_4_DEPTH)

    # CirPattern5 5 outline → CirPattern5 5 (cut)
    with BuildSketch(Plane.XY.offset(CIRPATTERN5_START_4)):
        with BuildLine():
            Line((42.5, -5), (46.5, -5))
            ThreePointArc((46.5, -5), (44.263932023, -4.472135955), (42.5, -3))
            Line((42.5, -3), (42.5, -5))
        make_face()
    extrude(amount=CIRPATTERN5_5_DEPTH, mode=Mode.SUBTRACT)

    # CirPattern5 6 outline → CirPattern5 6 (add)
    with BuildSketch(Plane.XY.offset(CIRPATTERN5_START_4)):
        with BuildLine():
            ThreePointArc((41.5, 0), (41.75658351, -1.58113883), (42.5, -3))
            Line((42.5, -3), (42.5, 0))
            Line((42.5, 0), (41.5, 0))
        make_face()
    extrude(amount=CIRPATTERN5_6_DEPTH)

    # Mirror1: read off the stored shape, not the designer's step
    # Mirror1 outline → Mirror1 (add)
    with BuildSketch(Plane.XY.offset(MIRROR1_START)):
        with BuildLine():
            Line((-56.5, 5), (-56.5, 1))
            ThreePointArc((-56.5, 1), (-56.792893219, 0.292893219), (-57.5, 0))
            Line((-57.5, 0), (-43.5, 0))
            Line((-43.5, 0), (-43.5, 10))
            Line((-43.5, 10), (-51.5, 10))
            ThreePointArc((-51.5, 10), (-55.035533906, 8.535533906), (-56.5, 5))
        make_face()
    extrude(amount=MIRROR1_DEPTH)

    # Mirror1 2 outline → Mirror1 2 (add)
    with BuildSketch(Plane.XY.offset(MIRROR1_START_2)):
        with BuildLine():
            Line((-56.5, 5), (-56.5, 1))
            ThreePointArc((-56.5, 1), (-56.792893219, 0.292893219), (-57.5, 0))
            Line((-57.5, 0), (-43.5, 0))
            Line((-43.5, 0), (-43.5, 10))
            Line((-43.5, 10), (-51.5, 10))
            ThreePointArc((-51.5, 10), (-55.035533906, 8.535533906), (-56.5, 5))
        make_face()
    extrude(amount=MIRROR1_2_DEPTH)

    # Mirror1 3 outline → Mirror1 3 (add)
    with BuildSketch(Plane(origin=(0, 0, 0), x_dir=(1, 0, 0), z_dir=(0, 1, 0)).offset(MIRROR1_START_3)):
        with BuildLine():
            Line((-37.5, -7.5), (-37.5, -7))
            Line((-37.5, -7), (-42.5, -7))
            Line((-42.5, -7), (-42.5, 7))
            Line((-42.5, 7), (-37.5, 7))
            Line((-37.5, 7), (-37.5, 7.5))
            Line((-37.5, 7.5), (-62.5, 7.5))
            ThreePointArc((-62.5, 7.5), (-70, 0), (-62.5, -7.5))
            Line((-62.5, -7.5), (-37.5, -7.5))
        make_face()
        with Locations((-62.5, 0)):
            Circle(MIRROR1_3_OUTLINE_R, mode=Mode.SUBTRACT)
    extrude(amount=MIRROR1_3_DEPTH)

    # Mirror1 4 outline → Mirror1 4 (add)
    with BuildSketch(Plane(origin=(0, 0, 0), x_dir=(1, 0, 0), z_dir=(0, 1, 0))):
        with Locations((-43, 0)):
            Rectangle(MIRROR1_4_OUTLINE_W, MIRROR1_4_OUTLINE_H)
    extrude(amount=MIRROR1_4_DEPTH)

    # Mirror1 5 outline → Mirror1 5 (cut)
    with BuildSketch(Plane.XY.offset(MIRROR1_START_4)):
        with BuildLine():
            ThreePointArc((-42.5, -3), (-44.263932023, -4.472135955), (-46.5, -5))
            Line((-46.5, -5), (-42.5, -5))
            Line((-42.5, -5), (-42.5, -3))
        make_face()
    extrude(amount=MIRROR1_5_DEPTH, mode=Mode.SUBTRACT)

    # Mirror1 6 outline → Mirror1 6 (add)
    with BuildSketch(Plane.XY.offset(MIRROR1_START_4)):
        with BuildLine():
            Line((-42.5, 0), (-42.5, -3))
            ThreePointArc((-42.5, -3), (-41.75658351, -1.58113883), (-41.5, 0))
            Line((-41.5, 0), (-42.5, 0))
        make_face()
    extrude(amount=MIRROR1_6_DEPTH)

    # Sketch16 → Cut-Extrude9 (cut)
    with BuildSketch(Plane(origin=(0, 40, 0), x_dir=(1, 0, 0), z_dir=(0, 1, 0))):
        with Locations((24, -12.5)):
            Rectangle(SKETCH16_W, SKETCH16_H)
        with Locations((24, -17.5)):
            Rectangle(SKETCH16_W, SKETCH16_H)
    extrude(amount=-CUT_EXTRUDE9_DEPTH, mode=Mode.SUBTRACT)

    # Sketch17 → Boss-Extrude8 (add)
    with BuildSketch(Plane(origin=(-5, 0, 0), x_dir=(0, 0, -1), z_dir=(1, 0, 0))):
        with BuildLine():
            Line((26, 20), (-24, 20))
            add(Edge.make_bspline(
                [(26, 20), (26, 30), (1, 30), (-24, 30), (-24, 20)],
                knots=[3.141592654, 3.141592654, 3.141592654, 4.71238898, 4.71238898, 6.283185307, 6.283185307, 6.283185307], degree=2, weights=[1, 0.707106781, 1, 0.707106781, 1]))
        make_face()
    extrude(amount=-BOSS_EXTRUDE8_DEPTH)

    # Sketch18 → Boss-Extrude9 (add)
    with BuildSketch(Plane.ZY.offset(25)):
        with BuildLine():
            Line((-24, 22.5), (19, 22.5))
            Line((19, 22.5), (19, 20))
            Line((19, 20), (-26, 20))
            Line((-26, 20), (-26, 20.5))
            ThreePointArc((-26, 20.5), (-25.414213562, 21.914213562), (-24, 22.5))
        make_face()
    extrude(amount=BOSS_EXTRUDE9_DEPTH)

    # Sketch19 → Cut-Revolve2 (revolve, cut)
    with BuildSketch(Plane.XY.offset(26)):
        with BuildLine():
            Line((-32.5, 15), (-32.5, 5))
            ThreePointArc((-32.5, 5), (-27.5, 10), (-32.5, 15))
        make_face()
    cut_revolve2 = revolve(axis=Axis((-32.5, 15, 26), (0, -1, 0)), mode=Mode.SUBTRACT)

    # Mirror3: Cut-Revolve2 across plane
    add(cut_revolve2.mirror(Plane(origin=(0, 0, 0), x_dir=(0, 0, 1), z_dir=(1, 0, 0))), mode=Mode.SUBTRACT)

    # Sketch25 → Cut-Extrude10 (cut, through all)
    with BuildSketch(Plane.ZY.offset(42.5)):
        with Locations((-20.5, 10)):
            Rectangle(SKETCH25_W, SKETCH25_H)
    extrude(amount=-CUT_EXTRUDE10_DEPTH, mode=Mode.SUBTRACT)

    # Sketch11 → Cut-Extrude8 (cut)
    with BuildSketch(Plane(origin=(0, 40, 0), x_dir=(1, 0, 0), z_dir=(0, 1, 0))):
        with Locations((24, -15)):
            Rectangle(SKETCH11_W, SKETCH11_H)
        with Locations((24, -10)):
            Rectangle(SKETCH11_W, SKETCH11_H)
    extrude(amount=-CUT_EXTRUDE8_DEPTH, mode=Mode.SUBTRACT)

    # Sketch26 → Cut-Extrude11 (cut, through all)
    with BuildSketch(Plane.ZY.offset(43.5)):
        with Locations((0, 8.5)):
            Rectangle(SKETCH26_W, SKETCH26_H)
    extrude(amount=-CUT_EXTRUDE11_DEPTH, mode=Mode.SUBTRACT)


solid = part.part
